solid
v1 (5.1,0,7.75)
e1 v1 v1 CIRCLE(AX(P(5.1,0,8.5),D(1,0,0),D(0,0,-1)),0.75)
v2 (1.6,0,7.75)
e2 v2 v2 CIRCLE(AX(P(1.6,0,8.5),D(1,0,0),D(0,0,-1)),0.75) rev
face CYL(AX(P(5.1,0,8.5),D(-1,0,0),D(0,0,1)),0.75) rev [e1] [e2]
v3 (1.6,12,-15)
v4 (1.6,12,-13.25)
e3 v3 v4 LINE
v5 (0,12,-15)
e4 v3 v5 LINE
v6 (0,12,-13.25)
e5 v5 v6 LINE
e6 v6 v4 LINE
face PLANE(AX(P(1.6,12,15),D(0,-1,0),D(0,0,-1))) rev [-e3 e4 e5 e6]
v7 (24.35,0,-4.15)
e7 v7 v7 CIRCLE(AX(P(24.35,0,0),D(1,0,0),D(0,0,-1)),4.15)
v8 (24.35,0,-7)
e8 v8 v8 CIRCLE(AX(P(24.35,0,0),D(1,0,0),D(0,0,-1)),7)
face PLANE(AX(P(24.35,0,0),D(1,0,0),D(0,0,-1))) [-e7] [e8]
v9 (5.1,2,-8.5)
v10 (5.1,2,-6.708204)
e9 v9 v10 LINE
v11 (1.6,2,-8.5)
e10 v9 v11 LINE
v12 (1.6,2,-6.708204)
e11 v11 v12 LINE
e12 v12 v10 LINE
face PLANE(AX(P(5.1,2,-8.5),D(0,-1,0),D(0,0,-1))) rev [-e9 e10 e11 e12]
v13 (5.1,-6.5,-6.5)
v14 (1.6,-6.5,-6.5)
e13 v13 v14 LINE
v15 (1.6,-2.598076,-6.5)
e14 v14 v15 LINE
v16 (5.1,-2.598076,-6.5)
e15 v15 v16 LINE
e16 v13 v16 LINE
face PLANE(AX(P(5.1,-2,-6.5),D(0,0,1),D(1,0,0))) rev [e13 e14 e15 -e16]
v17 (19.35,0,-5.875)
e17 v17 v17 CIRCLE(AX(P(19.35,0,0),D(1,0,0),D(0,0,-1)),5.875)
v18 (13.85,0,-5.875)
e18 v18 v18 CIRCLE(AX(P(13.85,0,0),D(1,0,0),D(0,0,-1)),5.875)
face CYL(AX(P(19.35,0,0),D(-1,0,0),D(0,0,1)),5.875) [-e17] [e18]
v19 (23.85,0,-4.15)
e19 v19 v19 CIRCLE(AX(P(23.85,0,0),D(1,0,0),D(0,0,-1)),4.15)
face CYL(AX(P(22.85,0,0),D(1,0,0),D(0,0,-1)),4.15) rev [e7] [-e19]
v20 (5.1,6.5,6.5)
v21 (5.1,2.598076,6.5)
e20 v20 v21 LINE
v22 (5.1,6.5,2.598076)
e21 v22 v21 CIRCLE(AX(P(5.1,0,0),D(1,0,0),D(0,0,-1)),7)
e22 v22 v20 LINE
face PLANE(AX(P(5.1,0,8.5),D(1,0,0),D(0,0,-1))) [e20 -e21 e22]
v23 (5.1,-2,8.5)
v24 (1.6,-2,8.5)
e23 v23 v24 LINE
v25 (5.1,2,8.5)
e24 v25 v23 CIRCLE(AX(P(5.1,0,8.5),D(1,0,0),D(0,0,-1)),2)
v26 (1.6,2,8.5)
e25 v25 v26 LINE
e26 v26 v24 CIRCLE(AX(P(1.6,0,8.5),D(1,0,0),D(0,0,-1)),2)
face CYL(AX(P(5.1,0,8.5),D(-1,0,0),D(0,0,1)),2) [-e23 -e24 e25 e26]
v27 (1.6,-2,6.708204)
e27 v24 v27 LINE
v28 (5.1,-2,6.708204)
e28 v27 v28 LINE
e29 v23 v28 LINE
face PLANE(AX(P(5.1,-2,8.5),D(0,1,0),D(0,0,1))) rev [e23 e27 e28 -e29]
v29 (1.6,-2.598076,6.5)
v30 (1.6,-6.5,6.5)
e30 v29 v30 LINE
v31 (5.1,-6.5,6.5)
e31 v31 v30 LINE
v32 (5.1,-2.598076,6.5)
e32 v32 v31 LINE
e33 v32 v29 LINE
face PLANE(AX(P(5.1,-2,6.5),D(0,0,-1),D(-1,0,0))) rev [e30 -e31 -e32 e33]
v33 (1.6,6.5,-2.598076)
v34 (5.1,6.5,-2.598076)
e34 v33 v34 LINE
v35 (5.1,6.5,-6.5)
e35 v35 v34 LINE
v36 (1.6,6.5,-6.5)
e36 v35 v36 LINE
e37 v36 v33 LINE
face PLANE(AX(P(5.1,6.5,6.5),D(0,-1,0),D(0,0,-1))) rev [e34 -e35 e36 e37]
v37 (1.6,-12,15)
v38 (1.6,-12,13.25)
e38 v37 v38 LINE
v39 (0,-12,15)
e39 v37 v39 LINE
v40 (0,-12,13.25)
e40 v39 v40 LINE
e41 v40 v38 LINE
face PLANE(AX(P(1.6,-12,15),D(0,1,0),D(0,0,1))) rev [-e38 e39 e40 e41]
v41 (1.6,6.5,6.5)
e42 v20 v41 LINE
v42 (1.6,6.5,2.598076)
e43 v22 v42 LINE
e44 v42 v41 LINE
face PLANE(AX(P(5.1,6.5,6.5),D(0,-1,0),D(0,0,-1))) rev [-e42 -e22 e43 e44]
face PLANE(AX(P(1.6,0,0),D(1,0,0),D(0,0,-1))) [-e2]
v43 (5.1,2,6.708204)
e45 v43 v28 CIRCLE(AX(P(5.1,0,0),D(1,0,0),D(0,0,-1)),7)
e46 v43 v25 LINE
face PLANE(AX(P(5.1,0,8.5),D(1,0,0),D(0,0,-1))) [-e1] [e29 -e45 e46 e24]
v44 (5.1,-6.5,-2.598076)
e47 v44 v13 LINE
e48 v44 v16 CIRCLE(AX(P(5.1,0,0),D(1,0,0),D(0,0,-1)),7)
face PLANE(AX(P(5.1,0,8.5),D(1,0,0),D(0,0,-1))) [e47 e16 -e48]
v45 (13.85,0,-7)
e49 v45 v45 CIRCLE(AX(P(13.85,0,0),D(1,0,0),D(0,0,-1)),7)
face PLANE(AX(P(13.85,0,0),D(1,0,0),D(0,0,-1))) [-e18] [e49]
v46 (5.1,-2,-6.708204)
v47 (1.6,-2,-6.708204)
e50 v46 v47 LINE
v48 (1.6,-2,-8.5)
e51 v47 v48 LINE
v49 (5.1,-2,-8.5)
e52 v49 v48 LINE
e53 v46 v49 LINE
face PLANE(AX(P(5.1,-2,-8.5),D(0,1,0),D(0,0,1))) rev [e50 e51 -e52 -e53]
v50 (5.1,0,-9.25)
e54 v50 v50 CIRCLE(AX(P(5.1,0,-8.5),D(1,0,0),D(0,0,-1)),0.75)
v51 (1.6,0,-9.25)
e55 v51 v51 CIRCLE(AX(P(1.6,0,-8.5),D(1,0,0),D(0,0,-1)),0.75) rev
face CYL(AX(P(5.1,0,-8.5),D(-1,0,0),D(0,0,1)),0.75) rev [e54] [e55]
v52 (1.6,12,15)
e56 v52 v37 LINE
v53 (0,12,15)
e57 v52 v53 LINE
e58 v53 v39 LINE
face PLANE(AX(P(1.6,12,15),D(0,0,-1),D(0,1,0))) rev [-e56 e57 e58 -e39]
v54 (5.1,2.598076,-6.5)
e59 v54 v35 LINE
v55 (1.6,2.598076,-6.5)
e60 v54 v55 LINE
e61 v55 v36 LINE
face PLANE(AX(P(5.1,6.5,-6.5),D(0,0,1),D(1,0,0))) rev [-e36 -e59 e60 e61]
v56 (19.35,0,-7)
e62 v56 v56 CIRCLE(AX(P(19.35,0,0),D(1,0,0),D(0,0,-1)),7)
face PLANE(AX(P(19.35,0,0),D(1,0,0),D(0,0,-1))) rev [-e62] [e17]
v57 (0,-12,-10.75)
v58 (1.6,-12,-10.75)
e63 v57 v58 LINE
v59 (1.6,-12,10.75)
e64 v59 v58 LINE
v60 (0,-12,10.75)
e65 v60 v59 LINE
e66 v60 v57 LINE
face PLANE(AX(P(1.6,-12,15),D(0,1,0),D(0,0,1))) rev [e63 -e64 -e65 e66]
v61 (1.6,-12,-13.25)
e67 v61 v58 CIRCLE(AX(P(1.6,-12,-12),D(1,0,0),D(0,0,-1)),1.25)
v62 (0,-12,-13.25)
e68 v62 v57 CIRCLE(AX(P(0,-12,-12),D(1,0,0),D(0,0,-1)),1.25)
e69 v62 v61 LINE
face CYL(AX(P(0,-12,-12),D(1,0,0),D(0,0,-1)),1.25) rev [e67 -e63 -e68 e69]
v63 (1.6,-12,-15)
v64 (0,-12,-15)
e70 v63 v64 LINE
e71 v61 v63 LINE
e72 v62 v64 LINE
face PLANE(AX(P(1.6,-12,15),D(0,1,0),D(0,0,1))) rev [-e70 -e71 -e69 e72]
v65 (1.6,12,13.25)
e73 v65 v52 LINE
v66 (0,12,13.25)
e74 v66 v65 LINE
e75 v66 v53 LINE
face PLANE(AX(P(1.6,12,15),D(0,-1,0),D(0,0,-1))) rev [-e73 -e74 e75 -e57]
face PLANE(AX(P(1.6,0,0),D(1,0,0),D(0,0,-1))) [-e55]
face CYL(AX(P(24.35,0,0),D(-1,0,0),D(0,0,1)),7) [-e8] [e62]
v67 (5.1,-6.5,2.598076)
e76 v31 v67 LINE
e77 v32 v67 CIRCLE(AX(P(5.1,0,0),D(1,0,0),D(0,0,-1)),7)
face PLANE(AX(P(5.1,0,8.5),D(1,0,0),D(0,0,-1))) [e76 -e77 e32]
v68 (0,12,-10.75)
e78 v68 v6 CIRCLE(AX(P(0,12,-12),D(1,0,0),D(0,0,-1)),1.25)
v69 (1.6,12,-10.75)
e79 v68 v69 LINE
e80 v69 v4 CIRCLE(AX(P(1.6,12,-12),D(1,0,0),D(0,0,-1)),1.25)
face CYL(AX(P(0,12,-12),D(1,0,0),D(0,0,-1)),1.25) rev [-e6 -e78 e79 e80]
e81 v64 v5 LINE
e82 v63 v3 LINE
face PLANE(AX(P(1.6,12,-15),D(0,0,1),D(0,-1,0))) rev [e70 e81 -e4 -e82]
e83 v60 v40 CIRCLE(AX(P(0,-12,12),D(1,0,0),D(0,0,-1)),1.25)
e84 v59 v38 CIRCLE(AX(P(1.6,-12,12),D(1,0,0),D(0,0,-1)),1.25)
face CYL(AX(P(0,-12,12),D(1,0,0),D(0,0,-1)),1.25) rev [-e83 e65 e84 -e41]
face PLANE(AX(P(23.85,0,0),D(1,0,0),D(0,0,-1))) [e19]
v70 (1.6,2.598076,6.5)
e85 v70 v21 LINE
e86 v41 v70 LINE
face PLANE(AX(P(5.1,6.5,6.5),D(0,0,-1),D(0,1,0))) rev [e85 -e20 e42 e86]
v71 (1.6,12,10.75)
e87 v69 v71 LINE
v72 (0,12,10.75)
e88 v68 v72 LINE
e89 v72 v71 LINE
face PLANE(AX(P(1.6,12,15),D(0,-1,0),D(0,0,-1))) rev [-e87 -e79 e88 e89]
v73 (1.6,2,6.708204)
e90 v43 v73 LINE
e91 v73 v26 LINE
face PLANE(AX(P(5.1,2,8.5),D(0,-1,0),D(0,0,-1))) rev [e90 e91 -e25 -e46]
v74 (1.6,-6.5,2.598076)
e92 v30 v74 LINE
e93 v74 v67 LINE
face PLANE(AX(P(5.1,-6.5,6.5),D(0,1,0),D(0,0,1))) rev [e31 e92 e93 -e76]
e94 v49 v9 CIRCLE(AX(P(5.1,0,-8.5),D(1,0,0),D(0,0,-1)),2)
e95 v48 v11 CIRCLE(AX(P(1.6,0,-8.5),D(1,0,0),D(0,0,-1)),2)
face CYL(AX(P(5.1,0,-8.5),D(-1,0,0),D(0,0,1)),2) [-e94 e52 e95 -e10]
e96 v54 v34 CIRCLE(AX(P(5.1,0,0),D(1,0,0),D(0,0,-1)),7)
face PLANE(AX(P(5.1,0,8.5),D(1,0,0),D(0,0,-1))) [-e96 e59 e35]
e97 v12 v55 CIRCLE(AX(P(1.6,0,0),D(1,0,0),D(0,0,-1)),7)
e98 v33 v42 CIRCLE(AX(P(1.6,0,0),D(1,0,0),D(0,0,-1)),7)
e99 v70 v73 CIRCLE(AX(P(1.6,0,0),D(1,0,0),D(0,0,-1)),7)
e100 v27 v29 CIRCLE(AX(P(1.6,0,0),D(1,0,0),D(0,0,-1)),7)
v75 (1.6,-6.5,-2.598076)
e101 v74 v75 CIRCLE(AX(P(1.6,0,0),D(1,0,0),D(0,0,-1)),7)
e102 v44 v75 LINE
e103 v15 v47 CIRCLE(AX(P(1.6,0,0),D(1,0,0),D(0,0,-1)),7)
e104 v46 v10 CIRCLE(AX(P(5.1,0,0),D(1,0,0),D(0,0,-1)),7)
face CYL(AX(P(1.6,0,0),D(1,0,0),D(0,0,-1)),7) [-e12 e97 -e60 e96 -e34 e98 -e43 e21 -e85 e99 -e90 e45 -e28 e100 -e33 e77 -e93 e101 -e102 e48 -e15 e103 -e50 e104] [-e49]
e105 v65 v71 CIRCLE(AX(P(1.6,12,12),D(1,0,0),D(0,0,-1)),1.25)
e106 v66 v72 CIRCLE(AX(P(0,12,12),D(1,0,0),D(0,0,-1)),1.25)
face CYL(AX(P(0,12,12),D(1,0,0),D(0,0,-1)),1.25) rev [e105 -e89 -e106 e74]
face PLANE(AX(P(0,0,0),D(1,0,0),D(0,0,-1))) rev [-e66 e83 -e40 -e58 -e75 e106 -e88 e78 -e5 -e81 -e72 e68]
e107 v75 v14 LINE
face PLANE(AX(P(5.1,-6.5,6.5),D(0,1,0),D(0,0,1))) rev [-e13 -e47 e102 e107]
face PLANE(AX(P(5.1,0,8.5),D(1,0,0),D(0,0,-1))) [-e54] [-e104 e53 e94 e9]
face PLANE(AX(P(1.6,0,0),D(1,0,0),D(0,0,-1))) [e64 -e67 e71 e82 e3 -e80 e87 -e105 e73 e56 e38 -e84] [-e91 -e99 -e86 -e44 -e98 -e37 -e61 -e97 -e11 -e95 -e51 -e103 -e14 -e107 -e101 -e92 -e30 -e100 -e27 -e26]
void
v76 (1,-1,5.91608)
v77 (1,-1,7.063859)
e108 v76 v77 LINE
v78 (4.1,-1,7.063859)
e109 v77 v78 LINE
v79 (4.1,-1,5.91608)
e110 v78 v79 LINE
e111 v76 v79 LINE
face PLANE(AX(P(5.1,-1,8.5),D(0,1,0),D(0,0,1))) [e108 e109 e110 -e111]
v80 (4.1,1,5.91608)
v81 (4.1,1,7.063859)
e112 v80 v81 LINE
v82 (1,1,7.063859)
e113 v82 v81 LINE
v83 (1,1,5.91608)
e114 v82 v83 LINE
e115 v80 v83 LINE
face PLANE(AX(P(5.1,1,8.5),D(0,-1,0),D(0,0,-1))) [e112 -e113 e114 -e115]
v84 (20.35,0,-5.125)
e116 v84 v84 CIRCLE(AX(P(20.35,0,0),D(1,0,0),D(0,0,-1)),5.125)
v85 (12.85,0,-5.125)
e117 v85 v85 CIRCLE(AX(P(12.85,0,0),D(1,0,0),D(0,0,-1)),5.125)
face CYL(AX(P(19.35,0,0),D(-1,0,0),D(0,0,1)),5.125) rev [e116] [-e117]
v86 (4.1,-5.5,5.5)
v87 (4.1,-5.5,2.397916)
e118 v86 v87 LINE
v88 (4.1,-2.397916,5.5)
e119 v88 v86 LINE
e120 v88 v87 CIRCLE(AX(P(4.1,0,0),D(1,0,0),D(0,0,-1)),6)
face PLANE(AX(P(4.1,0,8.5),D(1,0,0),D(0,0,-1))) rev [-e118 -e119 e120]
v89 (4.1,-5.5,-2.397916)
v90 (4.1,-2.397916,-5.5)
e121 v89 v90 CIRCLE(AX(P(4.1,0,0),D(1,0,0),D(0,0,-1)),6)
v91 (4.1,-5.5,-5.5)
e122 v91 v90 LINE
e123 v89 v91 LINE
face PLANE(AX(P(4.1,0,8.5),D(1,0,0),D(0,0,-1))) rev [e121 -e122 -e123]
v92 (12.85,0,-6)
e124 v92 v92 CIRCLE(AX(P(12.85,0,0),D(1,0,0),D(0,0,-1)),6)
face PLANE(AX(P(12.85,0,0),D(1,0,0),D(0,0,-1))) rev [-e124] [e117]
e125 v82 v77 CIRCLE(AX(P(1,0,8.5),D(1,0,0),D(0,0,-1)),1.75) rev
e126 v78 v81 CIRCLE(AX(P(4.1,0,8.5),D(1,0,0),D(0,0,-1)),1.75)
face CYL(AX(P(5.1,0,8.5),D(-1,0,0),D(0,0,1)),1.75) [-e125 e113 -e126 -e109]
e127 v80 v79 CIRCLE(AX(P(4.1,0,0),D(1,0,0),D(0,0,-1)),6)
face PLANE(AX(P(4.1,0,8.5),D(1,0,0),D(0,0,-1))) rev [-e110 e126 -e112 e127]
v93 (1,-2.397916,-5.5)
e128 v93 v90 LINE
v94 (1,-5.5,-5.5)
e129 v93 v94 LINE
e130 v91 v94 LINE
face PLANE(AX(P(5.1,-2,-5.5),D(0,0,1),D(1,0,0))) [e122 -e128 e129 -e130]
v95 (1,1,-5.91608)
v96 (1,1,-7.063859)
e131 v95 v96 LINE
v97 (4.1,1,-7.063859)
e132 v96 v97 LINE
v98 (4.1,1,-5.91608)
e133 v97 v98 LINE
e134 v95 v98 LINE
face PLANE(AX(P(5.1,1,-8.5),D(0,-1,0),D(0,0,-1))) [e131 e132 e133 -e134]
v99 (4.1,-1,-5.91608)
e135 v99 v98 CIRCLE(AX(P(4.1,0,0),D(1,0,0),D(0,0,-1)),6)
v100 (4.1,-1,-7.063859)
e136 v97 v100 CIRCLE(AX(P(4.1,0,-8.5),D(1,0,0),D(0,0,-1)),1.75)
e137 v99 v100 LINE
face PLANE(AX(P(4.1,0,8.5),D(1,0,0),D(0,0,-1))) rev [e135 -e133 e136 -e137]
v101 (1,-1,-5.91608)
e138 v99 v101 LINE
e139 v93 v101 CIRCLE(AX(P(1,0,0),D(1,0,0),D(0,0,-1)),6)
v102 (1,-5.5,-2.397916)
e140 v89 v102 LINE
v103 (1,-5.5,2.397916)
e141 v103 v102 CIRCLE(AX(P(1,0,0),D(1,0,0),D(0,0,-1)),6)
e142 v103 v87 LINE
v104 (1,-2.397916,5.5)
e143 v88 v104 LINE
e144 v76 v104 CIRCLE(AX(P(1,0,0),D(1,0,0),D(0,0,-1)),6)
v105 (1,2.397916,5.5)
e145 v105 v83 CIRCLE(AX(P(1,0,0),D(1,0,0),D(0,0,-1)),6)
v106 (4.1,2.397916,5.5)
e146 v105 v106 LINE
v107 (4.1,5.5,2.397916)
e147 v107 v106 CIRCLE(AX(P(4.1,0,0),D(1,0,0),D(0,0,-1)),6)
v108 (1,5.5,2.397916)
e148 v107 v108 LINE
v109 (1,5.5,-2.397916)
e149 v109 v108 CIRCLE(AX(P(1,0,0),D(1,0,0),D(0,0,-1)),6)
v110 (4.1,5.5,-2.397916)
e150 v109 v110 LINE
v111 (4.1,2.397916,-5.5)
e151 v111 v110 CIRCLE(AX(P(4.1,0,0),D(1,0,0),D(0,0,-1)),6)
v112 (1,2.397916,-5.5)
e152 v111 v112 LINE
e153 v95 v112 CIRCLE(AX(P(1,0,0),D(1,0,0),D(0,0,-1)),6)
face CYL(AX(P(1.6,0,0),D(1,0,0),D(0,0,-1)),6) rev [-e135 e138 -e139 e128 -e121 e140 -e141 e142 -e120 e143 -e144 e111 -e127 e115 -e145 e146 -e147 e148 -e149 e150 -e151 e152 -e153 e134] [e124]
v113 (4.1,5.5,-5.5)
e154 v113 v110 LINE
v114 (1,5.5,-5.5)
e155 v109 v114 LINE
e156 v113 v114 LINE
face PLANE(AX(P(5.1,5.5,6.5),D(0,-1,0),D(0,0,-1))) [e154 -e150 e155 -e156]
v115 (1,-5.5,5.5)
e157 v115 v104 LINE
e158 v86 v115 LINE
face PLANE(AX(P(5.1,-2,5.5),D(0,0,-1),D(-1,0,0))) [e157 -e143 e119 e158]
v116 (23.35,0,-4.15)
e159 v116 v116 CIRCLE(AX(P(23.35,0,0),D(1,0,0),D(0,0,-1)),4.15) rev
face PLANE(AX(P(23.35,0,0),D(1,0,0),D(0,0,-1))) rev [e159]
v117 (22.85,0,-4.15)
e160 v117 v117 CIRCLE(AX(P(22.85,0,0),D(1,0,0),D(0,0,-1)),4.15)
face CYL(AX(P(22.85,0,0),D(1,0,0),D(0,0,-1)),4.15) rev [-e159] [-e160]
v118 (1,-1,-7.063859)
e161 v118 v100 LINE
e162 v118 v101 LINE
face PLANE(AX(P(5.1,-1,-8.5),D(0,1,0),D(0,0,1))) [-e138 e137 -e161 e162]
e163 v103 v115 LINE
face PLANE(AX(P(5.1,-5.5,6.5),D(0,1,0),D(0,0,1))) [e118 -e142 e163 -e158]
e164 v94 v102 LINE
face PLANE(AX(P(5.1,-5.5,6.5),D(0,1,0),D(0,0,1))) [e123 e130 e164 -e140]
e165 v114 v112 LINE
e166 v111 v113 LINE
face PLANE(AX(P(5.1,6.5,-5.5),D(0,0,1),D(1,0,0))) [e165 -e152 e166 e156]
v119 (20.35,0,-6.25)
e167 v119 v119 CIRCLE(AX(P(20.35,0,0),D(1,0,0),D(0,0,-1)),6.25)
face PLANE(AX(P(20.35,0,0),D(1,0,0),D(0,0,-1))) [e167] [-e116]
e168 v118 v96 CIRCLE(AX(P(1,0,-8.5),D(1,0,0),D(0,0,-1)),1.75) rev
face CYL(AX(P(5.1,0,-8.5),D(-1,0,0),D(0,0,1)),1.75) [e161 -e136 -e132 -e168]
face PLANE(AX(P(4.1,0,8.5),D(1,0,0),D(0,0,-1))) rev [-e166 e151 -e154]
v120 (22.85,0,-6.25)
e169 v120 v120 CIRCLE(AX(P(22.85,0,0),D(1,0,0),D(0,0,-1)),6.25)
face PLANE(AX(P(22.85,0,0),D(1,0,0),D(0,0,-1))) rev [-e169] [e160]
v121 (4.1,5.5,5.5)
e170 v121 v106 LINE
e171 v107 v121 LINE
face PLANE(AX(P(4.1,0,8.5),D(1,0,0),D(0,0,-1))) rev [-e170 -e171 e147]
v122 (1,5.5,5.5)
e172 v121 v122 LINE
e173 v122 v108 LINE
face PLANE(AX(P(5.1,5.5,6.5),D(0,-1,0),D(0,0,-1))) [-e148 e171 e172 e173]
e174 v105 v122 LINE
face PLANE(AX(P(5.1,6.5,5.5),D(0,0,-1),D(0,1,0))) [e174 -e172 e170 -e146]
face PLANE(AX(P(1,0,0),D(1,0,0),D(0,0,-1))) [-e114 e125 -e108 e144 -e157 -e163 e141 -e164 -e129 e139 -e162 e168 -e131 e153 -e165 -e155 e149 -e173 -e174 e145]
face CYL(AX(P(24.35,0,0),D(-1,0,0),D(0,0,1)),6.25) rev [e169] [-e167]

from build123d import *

# Parameters (mm, degrees)
CROQUIS_BASE_W               = 30
CROQUIS_BASE_H               = 24
PLACA_ELECTRONICA_DEPTH      = 1.6
CORTAR_EXTRUIR3_DEPTH        = 20.275891678
CROQUIS_MONTAJE_CAMARA_R     = 0.75
SALIENTE_EXTRUIR2_DEPTH      = 3.5
SALIENTE_EXTRUIR3_DEPTH      = 8.75
SALIENTE_EXTRUIR3_DEPTH_BACK = 3.5
CAMERA_STAGE_1_R             = 7
CAMERA_STAGE_2_R             = 5.875
SALIENTE_EXTRUIR4_DEPTH      = 5.5
SALIENTE_EXTRUIR5_START      = 5
CAMERA_STAGE_3_R             = 7
SALIENTE_EXTRUIR5_DEPTH      = 5
VACIADO5_START               = 1
VACIADO5_OUTLINE_R           = 5.125
VACIADO5_DEPTH               = 23.35
VACIADO5_2_OUTLINE_R         = 6
VACIADO5_2_OUTLINE_R_2       = 5.125
VACIADO5_2_DEPTH             = 11.85
VACIADO5_START_2             = 20.35
VACIADO5_3_OUTLINE_R         = 6.25
VACIADO5_3_OUTLINE_R_2       = 5.125
VACIADO5_3_DEPTH             = 4
VACIADO5_4_DEPTH             = 3.1
SALIENTE_EXTRUIR6_START      = -1.5
CROQUIS_LENTE_R              = 6.25
SALIENTE_EXTRUIR6_DEPTH      = 1.5
CROQUIS_LENTE_3_R            = 4.15
CORTAR_EXTRUIR2_DEPTH        = 1.5
SALIENTE_EXTRUIR7_START      = 0.5
CROQUIS_DEL_LENTE_R          = 4.15
SALIENTE_EXTRUIR7_DEPTH      = 0.5


# Read off the part's stored shape, not the designer's step: Vaciado5
with BuildPart() as part:
    # Croquis base → Placa electronica (new body)
    with BuildSketch(Plane(origin=(0, 0, 0), x_dir=(0, 0, -1), z_dir=(1, 0, 0))):
        Rectangle(CROQUIS_BASE_W, CROQUIS_BASE_H)
    extrude(amount=PLACA_ELECTRONICA_DEPTH)

    # Croquis barrenos → Cortar-Extruir3 (cut, through all)
    with BuildSketch(Plane(origin=(1.6, 0, 0), x_dir=(0, 0, -1), z_dir=(1, 0, 0))):
        with BuildLine():
            Line((-13.25, 12), (-10.75, 12))
            ThreePointArc((-10.75, 12), (-12, 10.75), (-13.25, 12))
        make_face()
        with BuildLine():
            Line((-13.25, -12), (-10.75, -12))
            ThreePointArc((-10.75, -12), (-12, -10.75), (-13.25, -12))
        make_face()
        with BuildLine():
            Line((10.75, 12), (13.25, 12))
            ThreePointArc((13.25, 12), (12, 10.75), (10.75, 12))
        make_face()
        with BuildLine():
            Line((10.75, -12), (13.25, -12))
            ThreePointArc((13.25, -12), (12, -10.75), (10.75, -12))
        make_face()
    extrude(amount=-CORTAR_EXTRUIR3_DEPTH, mode=Mode.SUBTRACT)

    # Croquis montaje camara → Saliente-Extruir2 (add)
    with BuildSketch(Plane(origin=(1.6, 0, 0), x_dir=(0, 0, -1), z_dir=(1, 0, 0))):
        with BuildLine():
            Line((-6.5, 6.5), (6.5, 6.5))
            Line((6.5, 6.5), (6.5, 2))
            Line((6.5, 2), (8.5, 2))
            ThreePointArc((8.5, 2), (10.5, 0), (8.5, -2))
            Line((8.5, -2), (6.5, -2))
            Line((6.5, -2), (6.5, -6.5))
            Line((6.5, -6.5), (-6.5, -6.5))
            Line((-6.5, -6.5), (-6.5, -2))
            Line((-6.5, -2), (-8.5, -2))
            ThreePointArc((-8.5, -2), (-10.5, 0), (-8.5, 2))
            Line((-8.5, 2), (-6.5, 2))
            Line((-6.5, 2), (-6.5, 6.5))
        make_face()
        with Locations((-8.5, 0)):
            Circle(CROQUIS_MONTAJE_CAMARA_R, mode=Mode.SUBTRACT)
        with Locations((8.5, 0)):
            Circle(CROQUIS_MONTAJE_CAMARA_R, mode=Mode.SUBTRACT)
    extrude(amount=SALIENTE_EXTRUIR2_DEPTH)

    # Camera Stage 1 → Saliente-Extruir3 (add, two sides: drawn at the far end of the back side and taken through both)
    with BuildSketch(Plane(origin=(5.1, 0, 0), x_dir=(0, 0, -1), z_dir=(1, 0, 0)).offset(-SALIENTE_EXTRUIR3_DEPTH_BACK)):
        Circle(CAMERA_STAGE_1_R)
    extrude(amount=SALIENTE_EXTRUIR3_DEPTH + SALIENTE_EXTRUIR3_DEPTH_BACK)

    # Camera Stage 2 → Saliente-Extruir4 (add)
    with BuildSketch(Plane(origin=(13.85, 0, 0), x_dir=(0, 0, -1), z_dir=(1, 0, 0))):
        Circle(CAMERA_STAGE_2_R)
    extrude(amount=SALIENTE_EXTRUIR4_DEPTH)

    # Camera Stage 3 → Saliente-Extruir5 (add)
    with BuildSketch(Plane(origin=(19.35, 0, 0), x_dir=(0, 0, -1), z_dir=(1, 0, 0)).offset(SALIENTE_EXTRUIR5_START)):
        Circle(CAMERA_STAGE_3_R)
    extrude(amount=-SALIENTE_EXTRUIR5_DEPTH)

    # Vaciado5 outline → Vaciado5 (cut)
    with BuildSketch(Plane.YZ.offset(VACIADO5_START)):
        Circle(VACIADO5_OUTLINE_R)
    extrude(amount=VACIADO5_DEPTH, mode=Mode.SUBTRACT)

    # Vaciado5 2 outline → Vaciado5 2 (cut)
    with BuildSketch(Plane.YZ.offset(VACIADO5_START)):
        Circle(VACIADO5_2_OUTLINE_R)
        Circle(VACIADO5_2_OUTLINE_R_2, mode=Mode.SUBTRACT)
    extrude(amount=VACIADO5_2_DEPTH, mode=Mode.SUBTRACT)

    # Vaciado5 3 outline → Vaciado5 3 (cut)
    with BuildSketch(Plane.YZ.offset(VACIADO5_START_2)):
        Circle(VACIADO5_3_OUTLINE_R)
        Circle(VACIADO5_3_OUTLINE_R_2, mode=Mode.SUBTRACT)
    extrude(amount=VACIADO5_3_DEPTH, mode=Mode.SUBTRACT)

    # Vaciado5 4 outline → Vaciado5 4 (cut)
    with BuildSketch(Plane.YZ.offset(VACIADO5_START)):
        with BuildLine():
            ThreePointArc((-1, 5.916079783), (0, 6), (1, 5.916079783))
            Line((1, 5.916079783), (1, 7.063859338))
            ThreePointArc((1, 7.063859338), (0, 6.75), (-1, 7.063859338))
            Line((-1, 7.063859338), (-1, 5.916079783))
        make_face()
        with BuildLine():
            ThreePointArc((-5.5, 2.397915762), (-4.242640687, 4.242640687), (-2.397915762, 5.5))
            Line((-2.397915762, 5.5), (-5.5, 5.5))
            Line((-5.5, 5.5), (-5.5, 2.397915762))
        make_face()
        with BuildLine():
            ThreePointArc((2.397915762, 5.5), (4.242640687, 4.242640687), (5.5, 2.397915762))
            Line((5.5, 2.397915762), (5.5, 5.5))
            Line((5.5, 5.5), (2.397915762, 5.5))
        make_face()
        with BuildLine():
            ThreePointArc((-2.397915762, -5.5), (-4.242640687, -4.242640687), (-5.5, -2.397915762))
            Line((-5.5, -2.397915762), (-5.5, -5.5))
            Line((-5.5, -5.5), (-2.397915762, -5.5))
        make_face()
        with BuildLine():
            ThreePointArc((5.5, -2.397915762), (4.242640687, -4.242640687), (2.397915762, -5.5))
            Line((2.397915762, -5.5), (5.5, -5.5))
            Line((5.5, -5.5), (5.5, -2.397915762))
        make_face()
        with BuildLine():
            ThreePointArc((1, -5.916079783), (0, -6), (-1, -5.916079783))
            Line((-1, -5.916079783), (-1, -7.063859338))
            ThreePointArc((-1, -7.063859338), (0, -6.75), (1, -7.063859338))
            Line((1, -7.063859338), (1, -5.916079783))
        make_face()
    extrude(amount=VACIADO5_4_DEPTH, mode=Mode.SUBTRACT)

    # Croquis lente → Saliente-Extruir6 (add)
    with BuildSketch(Plane(origin=(24.35, 0, 0), x_dir=(0, 0, -1), z_dir=(1, 0, 0)).offset(SALIENTE_EXTRUIR6_START)):
        Circle(CROQUIS_LENTE_R)
    extrude(amount=SALIENTE_EXTRUIR6_DEPTH)

    # Croquis lente<3> → Cortar-Extruir2 (cut)
    with BuildSketch(Plane(origin=(24.35, 0, 0), x_dir=(0, 0, -1), z_dir=(1, 0, 0))):
        Circle(CROQUIS_LENTE_3_R)
    extrude(amount=-CORTAR_EXTRUIR2_DEPTH, mode=Mode.SUBTRACT)

    # Croquis del lente → Saliente-Extruir7 (add)
    with BuildSketch(Plane(origin=(23.35, 0, 0), x_dir=(0, 0, -1), z_dir=(1, 0, 0)).offset(SALIENTE_EXTRUIR7_START)):
        Circle(CROQUIS_DEL_LENTE_R)
    extrude(amount=-SALIENTE_EXTRUIR7_DEPTH)


solid = part.part
